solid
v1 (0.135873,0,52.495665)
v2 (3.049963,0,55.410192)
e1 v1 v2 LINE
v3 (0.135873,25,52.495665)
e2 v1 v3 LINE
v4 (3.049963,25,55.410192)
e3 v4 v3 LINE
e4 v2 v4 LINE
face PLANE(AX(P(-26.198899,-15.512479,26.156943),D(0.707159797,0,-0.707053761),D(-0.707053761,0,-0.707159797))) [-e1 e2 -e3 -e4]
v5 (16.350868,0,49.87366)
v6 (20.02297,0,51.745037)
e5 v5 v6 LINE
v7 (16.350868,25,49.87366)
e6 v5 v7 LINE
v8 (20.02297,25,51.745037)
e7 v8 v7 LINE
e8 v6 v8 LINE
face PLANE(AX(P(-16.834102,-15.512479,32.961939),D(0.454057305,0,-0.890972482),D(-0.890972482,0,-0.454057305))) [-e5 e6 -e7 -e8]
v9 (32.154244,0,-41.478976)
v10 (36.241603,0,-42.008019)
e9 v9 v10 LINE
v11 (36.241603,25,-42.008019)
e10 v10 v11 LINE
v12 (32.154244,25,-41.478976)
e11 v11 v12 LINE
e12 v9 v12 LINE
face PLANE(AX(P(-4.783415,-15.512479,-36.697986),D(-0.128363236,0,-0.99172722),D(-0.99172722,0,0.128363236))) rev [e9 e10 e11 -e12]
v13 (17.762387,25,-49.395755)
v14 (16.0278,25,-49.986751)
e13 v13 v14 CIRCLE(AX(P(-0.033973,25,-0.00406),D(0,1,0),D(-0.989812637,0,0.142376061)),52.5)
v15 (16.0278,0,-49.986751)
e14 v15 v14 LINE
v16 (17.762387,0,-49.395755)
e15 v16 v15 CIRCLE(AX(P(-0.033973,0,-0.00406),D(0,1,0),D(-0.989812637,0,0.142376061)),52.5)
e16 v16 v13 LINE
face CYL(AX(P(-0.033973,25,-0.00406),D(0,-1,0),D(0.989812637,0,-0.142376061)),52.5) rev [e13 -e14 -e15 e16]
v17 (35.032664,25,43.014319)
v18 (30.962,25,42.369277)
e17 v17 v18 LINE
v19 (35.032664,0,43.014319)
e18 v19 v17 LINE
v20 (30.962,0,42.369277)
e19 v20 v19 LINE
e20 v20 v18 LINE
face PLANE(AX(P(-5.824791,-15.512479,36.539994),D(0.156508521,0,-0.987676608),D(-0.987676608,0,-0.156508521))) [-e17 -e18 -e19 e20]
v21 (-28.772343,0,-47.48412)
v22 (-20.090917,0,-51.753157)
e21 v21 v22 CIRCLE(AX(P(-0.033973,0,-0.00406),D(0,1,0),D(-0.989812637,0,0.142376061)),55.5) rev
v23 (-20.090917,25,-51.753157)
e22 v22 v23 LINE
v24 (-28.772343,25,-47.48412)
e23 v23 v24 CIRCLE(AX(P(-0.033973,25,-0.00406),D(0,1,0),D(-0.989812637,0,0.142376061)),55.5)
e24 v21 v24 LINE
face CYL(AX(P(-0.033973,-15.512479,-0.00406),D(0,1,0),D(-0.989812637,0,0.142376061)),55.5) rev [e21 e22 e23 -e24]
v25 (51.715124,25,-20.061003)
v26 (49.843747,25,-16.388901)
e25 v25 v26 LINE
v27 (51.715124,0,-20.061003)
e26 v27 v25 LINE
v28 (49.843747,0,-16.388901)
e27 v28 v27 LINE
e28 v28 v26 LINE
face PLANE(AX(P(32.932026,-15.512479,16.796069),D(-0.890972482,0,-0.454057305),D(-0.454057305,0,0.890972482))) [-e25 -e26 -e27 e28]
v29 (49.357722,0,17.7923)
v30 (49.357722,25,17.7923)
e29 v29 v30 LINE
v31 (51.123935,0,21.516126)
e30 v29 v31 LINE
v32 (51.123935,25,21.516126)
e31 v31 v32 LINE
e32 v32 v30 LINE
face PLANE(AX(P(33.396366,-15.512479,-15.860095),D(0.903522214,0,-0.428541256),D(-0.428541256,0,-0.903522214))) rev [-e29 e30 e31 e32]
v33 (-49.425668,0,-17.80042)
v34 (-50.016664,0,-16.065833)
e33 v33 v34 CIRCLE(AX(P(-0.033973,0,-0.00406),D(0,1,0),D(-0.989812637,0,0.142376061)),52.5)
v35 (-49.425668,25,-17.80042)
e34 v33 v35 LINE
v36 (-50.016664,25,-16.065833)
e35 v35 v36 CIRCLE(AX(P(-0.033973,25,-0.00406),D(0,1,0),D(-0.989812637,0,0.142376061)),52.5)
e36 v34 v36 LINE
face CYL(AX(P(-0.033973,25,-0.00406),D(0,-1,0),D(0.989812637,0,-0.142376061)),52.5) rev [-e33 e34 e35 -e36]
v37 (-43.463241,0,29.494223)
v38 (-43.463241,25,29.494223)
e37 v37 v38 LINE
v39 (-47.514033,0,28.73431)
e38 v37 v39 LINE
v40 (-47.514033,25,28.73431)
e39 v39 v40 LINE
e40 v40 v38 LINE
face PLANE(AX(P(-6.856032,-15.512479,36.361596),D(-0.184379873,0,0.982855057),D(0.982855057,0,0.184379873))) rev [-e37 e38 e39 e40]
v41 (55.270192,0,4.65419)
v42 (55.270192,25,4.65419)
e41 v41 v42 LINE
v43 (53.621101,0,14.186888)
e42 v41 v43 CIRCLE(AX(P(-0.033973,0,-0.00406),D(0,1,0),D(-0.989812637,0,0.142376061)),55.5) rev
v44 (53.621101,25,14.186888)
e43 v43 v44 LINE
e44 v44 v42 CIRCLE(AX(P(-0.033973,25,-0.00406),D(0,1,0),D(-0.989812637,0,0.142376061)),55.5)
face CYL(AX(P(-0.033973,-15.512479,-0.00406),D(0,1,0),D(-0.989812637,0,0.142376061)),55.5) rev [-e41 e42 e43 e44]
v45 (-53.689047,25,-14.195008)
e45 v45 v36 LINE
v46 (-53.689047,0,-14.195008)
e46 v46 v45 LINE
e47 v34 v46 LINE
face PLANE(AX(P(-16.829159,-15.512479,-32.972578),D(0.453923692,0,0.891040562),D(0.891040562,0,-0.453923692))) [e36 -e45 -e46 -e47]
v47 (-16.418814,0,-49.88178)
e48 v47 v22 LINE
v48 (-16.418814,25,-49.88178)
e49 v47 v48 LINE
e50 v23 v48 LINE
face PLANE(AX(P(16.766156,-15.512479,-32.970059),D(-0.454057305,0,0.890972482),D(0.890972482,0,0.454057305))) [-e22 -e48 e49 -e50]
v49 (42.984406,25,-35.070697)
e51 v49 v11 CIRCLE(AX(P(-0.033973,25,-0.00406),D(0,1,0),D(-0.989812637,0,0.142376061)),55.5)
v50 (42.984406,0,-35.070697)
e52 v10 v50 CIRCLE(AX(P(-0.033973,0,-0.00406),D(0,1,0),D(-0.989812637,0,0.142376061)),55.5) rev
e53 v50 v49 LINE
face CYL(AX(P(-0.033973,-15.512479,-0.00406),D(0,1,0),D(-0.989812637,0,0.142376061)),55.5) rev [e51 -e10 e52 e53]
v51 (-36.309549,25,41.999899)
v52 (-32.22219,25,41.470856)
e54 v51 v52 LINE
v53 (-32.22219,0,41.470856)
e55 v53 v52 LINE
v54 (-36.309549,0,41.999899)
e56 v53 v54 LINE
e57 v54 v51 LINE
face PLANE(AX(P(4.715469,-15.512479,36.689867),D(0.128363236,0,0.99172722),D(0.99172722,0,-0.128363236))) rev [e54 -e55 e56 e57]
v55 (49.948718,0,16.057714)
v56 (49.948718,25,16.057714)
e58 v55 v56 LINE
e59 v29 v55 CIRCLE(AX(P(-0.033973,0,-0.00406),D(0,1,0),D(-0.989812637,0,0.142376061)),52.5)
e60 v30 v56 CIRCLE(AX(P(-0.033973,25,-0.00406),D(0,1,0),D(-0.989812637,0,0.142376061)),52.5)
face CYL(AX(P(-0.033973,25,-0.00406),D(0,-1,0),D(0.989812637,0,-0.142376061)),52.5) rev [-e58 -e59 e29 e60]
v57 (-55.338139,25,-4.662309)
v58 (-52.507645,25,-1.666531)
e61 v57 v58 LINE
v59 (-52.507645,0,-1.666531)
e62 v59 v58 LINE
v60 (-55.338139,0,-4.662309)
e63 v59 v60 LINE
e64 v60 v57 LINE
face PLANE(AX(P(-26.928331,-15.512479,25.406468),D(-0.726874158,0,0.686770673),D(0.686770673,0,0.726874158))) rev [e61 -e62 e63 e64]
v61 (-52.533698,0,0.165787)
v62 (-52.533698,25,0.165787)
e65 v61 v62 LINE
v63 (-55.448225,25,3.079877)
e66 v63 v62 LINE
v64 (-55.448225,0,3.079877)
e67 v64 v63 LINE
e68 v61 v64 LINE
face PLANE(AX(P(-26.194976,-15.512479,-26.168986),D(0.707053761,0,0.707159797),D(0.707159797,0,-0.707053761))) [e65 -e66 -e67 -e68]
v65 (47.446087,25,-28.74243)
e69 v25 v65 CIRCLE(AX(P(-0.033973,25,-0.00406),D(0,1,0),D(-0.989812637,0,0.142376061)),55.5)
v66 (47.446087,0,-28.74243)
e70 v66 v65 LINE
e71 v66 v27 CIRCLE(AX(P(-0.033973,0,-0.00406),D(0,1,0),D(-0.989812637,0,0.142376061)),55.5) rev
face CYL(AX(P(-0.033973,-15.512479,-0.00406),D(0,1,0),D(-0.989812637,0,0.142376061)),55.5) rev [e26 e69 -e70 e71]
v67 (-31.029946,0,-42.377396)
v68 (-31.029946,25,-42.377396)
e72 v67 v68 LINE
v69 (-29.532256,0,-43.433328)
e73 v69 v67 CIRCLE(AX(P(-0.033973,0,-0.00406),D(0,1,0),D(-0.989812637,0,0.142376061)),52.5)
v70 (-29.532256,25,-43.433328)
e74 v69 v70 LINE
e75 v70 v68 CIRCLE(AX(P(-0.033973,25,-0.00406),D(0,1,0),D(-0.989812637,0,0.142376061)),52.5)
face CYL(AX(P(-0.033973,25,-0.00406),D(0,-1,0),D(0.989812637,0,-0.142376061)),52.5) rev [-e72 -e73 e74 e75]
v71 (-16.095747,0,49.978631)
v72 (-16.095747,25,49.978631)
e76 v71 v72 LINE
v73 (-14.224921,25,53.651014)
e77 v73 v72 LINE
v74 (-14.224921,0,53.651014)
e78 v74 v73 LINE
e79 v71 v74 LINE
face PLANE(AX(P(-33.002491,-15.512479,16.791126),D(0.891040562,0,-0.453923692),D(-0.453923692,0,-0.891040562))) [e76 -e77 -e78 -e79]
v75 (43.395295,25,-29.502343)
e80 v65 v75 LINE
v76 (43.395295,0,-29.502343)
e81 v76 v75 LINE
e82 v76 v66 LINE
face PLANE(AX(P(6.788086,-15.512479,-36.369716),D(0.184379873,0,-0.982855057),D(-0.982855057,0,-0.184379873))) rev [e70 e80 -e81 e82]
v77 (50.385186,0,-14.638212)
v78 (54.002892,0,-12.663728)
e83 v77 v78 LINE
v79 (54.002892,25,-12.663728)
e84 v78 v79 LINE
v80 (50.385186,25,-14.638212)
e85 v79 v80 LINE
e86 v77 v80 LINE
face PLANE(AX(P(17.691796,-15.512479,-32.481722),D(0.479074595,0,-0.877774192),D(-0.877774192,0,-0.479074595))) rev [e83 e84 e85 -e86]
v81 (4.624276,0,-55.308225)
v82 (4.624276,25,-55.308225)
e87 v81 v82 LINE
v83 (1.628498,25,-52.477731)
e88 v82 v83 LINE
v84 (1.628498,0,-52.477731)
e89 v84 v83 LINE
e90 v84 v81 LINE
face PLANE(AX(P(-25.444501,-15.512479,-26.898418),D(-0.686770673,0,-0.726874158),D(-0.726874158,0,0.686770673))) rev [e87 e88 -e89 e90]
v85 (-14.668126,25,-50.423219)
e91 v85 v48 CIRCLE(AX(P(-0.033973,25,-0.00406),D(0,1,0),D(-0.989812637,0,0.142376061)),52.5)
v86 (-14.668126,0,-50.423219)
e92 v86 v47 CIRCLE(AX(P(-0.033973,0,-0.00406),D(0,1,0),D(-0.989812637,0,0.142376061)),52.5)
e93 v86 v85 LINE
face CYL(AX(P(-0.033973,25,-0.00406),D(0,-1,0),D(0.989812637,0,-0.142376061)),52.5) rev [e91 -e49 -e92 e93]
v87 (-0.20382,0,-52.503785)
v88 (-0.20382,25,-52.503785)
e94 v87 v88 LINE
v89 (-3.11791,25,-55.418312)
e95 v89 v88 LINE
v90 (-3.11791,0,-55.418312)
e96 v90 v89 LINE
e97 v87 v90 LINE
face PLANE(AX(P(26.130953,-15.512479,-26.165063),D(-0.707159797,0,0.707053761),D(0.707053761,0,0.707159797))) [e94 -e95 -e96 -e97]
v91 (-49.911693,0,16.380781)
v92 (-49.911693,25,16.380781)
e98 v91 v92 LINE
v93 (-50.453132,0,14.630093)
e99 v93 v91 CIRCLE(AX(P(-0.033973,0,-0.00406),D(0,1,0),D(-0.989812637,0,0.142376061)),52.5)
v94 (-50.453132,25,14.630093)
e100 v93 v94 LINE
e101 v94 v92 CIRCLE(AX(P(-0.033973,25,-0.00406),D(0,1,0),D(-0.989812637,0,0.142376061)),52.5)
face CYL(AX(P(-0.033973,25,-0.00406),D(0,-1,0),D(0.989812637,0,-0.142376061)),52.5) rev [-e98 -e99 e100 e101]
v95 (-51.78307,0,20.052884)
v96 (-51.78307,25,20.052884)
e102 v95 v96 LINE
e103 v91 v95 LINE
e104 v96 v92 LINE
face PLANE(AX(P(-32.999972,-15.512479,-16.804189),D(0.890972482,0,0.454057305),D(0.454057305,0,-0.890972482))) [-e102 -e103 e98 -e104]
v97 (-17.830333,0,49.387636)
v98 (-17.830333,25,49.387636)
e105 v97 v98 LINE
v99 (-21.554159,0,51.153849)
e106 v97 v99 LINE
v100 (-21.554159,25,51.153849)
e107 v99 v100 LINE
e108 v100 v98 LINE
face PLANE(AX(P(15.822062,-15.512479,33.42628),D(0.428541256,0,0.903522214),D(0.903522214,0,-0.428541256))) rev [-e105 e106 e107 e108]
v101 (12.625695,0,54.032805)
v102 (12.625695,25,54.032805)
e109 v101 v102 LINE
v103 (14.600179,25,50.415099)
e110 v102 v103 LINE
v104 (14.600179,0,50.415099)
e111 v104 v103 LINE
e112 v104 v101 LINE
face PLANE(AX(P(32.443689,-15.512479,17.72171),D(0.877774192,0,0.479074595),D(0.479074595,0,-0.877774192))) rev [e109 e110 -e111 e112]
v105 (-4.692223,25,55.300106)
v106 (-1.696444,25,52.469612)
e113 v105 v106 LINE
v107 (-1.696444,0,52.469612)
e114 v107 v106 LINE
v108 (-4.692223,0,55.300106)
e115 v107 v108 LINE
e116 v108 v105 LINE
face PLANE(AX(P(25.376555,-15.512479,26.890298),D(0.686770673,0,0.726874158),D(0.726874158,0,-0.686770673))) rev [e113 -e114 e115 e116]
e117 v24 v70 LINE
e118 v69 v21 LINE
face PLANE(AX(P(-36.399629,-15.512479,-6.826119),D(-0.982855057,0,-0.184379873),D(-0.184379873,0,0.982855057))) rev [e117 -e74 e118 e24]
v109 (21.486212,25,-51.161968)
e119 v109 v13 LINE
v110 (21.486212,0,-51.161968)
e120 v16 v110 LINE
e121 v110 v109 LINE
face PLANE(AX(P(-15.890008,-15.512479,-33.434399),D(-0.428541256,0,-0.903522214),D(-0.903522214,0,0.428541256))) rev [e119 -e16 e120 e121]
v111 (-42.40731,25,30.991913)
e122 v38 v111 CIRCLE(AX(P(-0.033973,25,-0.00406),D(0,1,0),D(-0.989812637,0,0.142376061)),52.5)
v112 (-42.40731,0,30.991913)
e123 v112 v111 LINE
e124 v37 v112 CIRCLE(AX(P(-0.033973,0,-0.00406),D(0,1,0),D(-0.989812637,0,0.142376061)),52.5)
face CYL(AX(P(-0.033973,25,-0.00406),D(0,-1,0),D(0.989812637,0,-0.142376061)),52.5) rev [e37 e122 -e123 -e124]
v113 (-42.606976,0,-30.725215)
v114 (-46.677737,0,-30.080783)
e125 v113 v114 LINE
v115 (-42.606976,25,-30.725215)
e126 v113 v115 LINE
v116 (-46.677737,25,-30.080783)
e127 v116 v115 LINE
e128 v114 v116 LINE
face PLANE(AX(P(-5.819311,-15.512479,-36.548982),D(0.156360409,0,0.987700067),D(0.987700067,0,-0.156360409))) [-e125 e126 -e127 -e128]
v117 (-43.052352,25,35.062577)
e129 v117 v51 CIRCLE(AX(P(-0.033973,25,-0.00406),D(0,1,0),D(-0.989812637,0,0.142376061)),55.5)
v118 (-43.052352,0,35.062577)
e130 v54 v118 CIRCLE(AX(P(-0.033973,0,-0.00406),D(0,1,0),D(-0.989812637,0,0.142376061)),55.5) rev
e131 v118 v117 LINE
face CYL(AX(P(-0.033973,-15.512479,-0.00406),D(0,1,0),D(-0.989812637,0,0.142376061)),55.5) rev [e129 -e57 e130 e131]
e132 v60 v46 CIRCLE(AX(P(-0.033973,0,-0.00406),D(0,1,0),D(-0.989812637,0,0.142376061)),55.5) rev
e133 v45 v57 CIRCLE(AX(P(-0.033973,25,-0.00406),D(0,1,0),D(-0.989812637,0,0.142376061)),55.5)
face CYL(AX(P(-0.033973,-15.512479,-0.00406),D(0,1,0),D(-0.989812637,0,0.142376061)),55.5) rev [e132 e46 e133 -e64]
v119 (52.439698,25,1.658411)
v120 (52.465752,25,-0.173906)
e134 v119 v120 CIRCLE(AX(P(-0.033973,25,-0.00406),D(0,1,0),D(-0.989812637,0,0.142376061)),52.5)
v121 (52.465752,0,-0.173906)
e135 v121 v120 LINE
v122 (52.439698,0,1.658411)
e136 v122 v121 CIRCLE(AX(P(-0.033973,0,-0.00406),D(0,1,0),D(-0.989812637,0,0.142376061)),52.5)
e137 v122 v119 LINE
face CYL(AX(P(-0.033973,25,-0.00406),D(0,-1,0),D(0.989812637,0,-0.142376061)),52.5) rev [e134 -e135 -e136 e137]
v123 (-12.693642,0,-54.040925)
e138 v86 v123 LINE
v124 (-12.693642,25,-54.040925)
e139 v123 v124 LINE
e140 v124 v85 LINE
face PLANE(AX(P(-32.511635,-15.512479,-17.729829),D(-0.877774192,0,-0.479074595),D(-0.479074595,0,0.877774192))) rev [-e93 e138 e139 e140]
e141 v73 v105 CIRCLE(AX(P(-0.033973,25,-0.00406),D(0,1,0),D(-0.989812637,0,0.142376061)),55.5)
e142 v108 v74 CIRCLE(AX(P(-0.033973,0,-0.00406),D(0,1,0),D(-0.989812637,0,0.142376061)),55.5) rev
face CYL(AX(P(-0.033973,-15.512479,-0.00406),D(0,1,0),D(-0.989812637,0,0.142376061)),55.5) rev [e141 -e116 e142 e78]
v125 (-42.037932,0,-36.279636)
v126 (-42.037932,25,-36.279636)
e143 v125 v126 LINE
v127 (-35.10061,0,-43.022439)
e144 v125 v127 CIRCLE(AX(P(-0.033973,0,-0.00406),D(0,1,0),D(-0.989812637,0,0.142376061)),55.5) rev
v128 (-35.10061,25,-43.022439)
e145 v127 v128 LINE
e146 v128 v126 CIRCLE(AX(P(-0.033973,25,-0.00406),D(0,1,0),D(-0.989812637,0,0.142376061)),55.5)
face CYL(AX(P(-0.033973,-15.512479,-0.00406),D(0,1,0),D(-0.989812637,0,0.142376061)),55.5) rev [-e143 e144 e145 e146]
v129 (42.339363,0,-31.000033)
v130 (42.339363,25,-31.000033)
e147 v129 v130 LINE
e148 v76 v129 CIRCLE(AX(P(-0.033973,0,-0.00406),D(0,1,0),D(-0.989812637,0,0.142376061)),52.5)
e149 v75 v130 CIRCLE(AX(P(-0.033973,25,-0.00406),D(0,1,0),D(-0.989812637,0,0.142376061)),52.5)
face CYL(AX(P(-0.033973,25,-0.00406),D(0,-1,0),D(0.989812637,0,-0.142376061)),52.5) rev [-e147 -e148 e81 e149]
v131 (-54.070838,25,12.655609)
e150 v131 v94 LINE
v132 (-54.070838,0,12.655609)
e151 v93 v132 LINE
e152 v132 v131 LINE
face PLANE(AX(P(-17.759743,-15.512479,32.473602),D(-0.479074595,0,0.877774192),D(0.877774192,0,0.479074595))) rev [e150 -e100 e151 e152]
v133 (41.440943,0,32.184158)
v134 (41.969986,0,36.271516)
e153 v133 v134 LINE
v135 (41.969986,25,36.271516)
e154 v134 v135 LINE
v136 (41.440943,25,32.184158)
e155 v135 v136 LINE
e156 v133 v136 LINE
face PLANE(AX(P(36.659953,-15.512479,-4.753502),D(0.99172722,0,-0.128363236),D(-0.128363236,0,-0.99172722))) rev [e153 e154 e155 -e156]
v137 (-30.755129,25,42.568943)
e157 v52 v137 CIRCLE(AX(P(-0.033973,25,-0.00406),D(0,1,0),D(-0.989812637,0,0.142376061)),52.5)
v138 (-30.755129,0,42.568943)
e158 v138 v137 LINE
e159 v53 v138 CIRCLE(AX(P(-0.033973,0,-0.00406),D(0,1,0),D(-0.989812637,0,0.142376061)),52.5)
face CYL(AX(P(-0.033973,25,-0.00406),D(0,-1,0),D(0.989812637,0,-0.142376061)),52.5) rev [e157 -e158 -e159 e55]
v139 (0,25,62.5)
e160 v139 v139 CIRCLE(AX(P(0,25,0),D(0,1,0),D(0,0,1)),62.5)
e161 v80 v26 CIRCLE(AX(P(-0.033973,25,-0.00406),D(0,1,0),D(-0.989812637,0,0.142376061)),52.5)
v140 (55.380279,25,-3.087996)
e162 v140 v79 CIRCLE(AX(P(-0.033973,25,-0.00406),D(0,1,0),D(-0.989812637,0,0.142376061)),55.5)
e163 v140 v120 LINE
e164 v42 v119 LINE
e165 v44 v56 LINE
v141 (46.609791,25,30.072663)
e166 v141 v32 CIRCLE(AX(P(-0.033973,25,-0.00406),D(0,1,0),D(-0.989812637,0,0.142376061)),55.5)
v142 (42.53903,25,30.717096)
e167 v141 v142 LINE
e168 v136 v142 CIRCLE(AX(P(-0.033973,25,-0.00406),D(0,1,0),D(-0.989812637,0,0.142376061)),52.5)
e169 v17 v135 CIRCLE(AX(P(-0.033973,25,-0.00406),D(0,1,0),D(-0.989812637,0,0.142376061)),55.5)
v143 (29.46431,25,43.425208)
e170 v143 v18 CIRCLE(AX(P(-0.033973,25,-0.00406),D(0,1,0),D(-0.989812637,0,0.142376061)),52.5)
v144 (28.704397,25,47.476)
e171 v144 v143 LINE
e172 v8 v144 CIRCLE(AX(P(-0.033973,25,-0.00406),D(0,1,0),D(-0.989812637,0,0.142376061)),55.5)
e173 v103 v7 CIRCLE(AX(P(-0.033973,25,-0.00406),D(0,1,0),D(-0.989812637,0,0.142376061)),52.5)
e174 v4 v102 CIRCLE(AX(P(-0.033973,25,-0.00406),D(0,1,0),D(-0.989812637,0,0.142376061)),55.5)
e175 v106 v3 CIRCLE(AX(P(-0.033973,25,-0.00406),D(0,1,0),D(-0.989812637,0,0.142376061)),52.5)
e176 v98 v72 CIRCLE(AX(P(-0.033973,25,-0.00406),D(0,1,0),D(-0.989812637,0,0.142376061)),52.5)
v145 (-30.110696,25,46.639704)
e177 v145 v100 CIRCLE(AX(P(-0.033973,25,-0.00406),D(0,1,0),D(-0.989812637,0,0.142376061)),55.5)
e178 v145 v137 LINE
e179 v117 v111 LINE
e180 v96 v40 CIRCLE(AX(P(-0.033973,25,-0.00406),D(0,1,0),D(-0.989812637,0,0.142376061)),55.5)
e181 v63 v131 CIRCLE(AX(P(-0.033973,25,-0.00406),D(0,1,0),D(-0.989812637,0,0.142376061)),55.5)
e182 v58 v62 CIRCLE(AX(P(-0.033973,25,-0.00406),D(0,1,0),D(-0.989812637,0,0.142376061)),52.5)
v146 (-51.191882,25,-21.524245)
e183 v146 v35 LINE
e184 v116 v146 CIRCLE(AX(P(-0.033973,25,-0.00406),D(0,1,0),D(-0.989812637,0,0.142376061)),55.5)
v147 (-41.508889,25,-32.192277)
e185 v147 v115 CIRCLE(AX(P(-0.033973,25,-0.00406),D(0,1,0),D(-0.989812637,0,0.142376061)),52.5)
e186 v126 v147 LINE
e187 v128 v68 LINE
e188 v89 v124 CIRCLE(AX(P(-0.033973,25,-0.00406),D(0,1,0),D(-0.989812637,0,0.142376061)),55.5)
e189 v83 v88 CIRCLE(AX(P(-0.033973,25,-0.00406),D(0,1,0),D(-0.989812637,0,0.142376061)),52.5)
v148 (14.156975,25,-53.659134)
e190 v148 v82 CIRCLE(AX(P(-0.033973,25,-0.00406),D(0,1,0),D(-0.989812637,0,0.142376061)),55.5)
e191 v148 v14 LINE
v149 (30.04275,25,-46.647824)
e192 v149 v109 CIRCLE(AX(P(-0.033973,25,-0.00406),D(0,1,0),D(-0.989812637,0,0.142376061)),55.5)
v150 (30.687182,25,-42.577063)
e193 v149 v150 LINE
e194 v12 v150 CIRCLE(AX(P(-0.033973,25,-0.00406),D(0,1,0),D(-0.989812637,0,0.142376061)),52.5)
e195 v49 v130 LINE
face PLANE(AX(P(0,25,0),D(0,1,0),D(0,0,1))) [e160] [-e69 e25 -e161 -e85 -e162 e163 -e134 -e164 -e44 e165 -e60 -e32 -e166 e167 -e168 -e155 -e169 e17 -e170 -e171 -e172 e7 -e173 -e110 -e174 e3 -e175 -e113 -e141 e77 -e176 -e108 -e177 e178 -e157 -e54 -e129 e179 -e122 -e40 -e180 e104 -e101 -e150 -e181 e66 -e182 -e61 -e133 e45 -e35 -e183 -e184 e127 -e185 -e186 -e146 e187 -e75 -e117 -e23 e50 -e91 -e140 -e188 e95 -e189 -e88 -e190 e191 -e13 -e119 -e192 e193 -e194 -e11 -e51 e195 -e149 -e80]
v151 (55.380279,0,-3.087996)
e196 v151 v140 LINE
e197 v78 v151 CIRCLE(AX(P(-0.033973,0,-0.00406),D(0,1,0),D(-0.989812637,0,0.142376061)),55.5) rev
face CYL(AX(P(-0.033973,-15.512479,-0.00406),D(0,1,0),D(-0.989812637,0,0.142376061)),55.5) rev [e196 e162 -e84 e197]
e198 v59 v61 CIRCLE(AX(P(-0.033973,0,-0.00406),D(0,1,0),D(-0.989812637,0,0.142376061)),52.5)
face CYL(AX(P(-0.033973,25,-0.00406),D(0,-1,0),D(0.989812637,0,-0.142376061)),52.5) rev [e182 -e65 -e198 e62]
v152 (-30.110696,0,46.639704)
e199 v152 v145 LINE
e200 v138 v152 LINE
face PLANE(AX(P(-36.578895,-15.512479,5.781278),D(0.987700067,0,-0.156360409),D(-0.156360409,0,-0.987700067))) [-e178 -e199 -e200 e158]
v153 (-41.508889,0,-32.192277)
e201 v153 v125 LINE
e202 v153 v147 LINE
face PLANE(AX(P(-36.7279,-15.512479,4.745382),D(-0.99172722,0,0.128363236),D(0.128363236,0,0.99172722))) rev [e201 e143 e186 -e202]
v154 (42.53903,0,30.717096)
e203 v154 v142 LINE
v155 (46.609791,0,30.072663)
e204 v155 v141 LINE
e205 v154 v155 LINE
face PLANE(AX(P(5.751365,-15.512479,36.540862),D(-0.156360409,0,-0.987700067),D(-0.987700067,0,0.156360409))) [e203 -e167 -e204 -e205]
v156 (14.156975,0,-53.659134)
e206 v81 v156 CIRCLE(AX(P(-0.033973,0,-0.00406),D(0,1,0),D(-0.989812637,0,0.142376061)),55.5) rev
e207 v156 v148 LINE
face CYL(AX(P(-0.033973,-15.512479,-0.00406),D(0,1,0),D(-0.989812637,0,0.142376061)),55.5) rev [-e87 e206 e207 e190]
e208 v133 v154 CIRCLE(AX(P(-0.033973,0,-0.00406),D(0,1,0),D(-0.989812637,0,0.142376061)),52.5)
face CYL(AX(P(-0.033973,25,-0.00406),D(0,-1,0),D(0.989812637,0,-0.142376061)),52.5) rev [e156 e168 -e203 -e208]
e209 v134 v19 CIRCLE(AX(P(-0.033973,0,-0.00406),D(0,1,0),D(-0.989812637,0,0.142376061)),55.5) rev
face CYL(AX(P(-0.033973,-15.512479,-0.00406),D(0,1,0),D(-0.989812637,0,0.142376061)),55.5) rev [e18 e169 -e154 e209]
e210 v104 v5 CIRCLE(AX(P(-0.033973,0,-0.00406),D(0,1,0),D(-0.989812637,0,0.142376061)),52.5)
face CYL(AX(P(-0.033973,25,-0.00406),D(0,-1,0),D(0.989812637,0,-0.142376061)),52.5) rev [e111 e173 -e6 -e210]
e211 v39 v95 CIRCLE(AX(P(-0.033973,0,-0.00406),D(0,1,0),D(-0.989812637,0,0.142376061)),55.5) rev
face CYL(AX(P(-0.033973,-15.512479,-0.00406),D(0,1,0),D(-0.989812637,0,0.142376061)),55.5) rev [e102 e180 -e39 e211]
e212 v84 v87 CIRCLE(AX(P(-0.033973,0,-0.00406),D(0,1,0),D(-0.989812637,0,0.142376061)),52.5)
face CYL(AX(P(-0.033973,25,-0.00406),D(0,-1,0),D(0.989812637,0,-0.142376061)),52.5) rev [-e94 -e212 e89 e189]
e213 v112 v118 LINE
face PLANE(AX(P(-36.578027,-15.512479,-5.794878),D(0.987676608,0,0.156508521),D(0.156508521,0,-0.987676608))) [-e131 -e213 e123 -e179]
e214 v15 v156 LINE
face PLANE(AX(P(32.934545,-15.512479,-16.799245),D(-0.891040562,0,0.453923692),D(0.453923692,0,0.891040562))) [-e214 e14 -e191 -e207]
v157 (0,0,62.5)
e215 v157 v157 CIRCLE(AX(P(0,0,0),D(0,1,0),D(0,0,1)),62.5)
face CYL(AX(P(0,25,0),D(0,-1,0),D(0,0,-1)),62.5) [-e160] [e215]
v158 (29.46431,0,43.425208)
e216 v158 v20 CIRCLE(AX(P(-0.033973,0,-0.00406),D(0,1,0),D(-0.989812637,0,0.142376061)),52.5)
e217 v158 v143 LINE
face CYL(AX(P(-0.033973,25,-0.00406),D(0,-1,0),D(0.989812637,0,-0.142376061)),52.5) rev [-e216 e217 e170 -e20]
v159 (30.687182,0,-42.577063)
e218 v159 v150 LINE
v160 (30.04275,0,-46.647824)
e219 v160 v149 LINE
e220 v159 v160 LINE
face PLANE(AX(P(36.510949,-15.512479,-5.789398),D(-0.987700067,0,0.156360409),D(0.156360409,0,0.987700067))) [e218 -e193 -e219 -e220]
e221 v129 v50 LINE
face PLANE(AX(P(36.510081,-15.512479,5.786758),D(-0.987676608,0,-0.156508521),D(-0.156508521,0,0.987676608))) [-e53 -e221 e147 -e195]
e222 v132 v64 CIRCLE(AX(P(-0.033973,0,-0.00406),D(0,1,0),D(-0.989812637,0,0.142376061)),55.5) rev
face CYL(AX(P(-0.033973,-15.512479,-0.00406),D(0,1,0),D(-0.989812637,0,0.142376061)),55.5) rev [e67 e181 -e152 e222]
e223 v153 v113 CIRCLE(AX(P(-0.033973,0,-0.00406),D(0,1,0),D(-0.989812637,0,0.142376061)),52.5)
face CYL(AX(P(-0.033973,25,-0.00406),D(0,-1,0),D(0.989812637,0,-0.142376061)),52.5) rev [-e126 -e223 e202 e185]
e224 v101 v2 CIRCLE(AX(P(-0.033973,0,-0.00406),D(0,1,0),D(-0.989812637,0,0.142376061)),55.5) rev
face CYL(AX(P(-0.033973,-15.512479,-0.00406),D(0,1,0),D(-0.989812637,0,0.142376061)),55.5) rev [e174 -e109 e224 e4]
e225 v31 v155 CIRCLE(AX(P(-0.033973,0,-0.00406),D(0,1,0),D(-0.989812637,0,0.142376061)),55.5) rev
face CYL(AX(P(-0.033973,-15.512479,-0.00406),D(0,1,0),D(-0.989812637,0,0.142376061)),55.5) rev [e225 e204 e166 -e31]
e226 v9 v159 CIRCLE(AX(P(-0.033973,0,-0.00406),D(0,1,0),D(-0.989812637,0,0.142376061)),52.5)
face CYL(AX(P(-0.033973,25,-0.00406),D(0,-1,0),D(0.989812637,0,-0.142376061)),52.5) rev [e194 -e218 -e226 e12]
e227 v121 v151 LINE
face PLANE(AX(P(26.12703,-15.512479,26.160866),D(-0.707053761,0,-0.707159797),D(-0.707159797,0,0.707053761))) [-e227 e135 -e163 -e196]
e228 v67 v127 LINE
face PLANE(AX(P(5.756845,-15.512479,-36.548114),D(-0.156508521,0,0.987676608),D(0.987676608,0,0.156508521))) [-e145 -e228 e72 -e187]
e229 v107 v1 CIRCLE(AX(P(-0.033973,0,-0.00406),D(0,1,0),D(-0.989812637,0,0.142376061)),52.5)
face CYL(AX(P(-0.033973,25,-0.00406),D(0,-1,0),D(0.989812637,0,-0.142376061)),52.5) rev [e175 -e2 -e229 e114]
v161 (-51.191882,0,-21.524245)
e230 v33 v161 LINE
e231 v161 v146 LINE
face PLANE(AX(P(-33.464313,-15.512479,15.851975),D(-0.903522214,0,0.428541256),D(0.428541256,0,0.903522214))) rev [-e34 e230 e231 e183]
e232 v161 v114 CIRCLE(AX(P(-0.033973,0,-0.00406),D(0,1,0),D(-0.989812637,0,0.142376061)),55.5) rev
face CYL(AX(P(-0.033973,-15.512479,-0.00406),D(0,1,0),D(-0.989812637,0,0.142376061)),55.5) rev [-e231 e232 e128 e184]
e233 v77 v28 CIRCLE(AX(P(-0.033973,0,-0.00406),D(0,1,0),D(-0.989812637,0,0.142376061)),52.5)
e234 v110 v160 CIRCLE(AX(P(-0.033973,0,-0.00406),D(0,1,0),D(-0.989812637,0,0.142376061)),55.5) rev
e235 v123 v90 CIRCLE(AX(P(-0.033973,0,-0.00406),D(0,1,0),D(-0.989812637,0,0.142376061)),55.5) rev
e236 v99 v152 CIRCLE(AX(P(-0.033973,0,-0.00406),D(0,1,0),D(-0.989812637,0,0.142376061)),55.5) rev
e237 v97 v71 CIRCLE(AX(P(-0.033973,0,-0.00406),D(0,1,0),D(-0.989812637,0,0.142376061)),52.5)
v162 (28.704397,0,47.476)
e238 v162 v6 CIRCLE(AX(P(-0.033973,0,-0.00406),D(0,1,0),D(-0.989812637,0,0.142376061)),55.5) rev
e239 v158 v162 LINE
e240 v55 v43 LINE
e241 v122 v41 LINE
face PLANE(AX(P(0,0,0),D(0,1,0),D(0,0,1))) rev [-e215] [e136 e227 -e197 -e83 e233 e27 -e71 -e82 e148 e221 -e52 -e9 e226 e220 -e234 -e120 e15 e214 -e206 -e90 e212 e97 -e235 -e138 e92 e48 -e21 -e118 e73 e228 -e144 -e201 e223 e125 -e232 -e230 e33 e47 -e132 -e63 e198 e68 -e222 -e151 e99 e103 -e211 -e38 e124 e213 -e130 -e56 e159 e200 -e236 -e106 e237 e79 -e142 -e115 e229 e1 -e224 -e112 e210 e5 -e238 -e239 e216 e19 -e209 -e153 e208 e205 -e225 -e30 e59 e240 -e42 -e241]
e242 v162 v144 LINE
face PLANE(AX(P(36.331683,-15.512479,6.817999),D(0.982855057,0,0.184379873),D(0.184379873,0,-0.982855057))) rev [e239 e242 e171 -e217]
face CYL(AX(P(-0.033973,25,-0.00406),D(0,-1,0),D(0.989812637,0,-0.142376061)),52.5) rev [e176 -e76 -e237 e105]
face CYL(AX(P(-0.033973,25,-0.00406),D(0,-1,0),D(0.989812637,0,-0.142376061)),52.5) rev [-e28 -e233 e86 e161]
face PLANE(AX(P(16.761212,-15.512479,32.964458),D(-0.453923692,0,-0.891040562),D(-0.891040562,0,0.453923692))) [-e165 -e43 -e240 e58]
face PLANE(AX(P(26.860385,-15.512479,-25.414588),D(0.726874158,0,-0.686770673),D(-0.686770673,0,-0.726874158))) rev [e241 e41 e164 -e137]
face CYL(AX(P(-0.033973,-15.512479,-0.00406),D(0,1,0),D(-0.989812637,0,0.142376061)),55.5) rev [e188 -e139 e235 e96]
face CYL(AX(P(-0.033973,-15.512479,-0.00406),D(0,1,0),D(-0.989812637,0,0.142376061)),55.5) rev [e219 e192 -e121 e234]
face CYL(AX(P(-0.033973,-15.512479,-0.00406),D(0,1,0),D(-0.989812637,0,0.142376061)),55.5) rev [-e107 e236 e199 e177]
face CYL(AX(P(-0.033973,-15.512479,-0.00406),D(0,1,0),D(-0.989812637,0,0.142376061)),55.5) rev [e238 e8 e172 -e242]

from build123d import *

# Parameters (mm, degrees)
SKETCH1_R           = 62.5
BOSS_EXTRUDE1_DEPTH = 25
CAVITY1_DEPTH       = 25


# Read off the part's stored shape, not the designer's step: Cavity1
with BuildPart() as part:
    # Sketch1 → Boss-Extrude1 (new body)
    with BuildSketch(Plane(origin=(0, 0, 0), x_dir=(1, 0, 0), z_dir=(0, 1, 0))):
        with Locations(Location((0, 0, 0), (0, 0, 270))):
            Circle(SKETCH1_R)
    extrude(amount=BOSS_EXTRUDE1_DEPTH)

    # Cavity1 outline → Cavity1 (cut)
    with BuildSketch(Plane(origin=(0, 0, 0), x_dir=(1, 0, 0), z_dir=(0, 1, 0))):
        with BuildLine():
            Line((16.350867892, -49.873660473), (20.022970331, -51.745036944))
            ThreePointArc((20.022970331, -51.745036944), (24.456878574, -49.800038203), (28.704396647, -47.476000203))
            Line((28.704396647, -47.476000203), (29.464309883, -43.425207924))
            ThreePointArc((29.464309883, -43.425207924), (30.217762384, -42.903777412), (30.961999914, -42.369276757))
            Line((30.961999914, -42.369276757), (35.032663999, -43.014319485))
            ThreePointArc((35.032663999, -43.014319485), (38.648523661, -39.79436276), (41.969986165, -36.271516008))
            Line((41.969986165, -36.271516008), (41.440942946, -32.18415751))
            ThreePointArc((41.440942946, -32.18415751), (41.996387967, -31.455417996), (42.539030133, -30.717095621))
            Line((42.539030133, -30.717095621), (46.609790903, -30.07266333))
            ThreePointArc((46.609790903, -30.07266333), (49.053656447, -25.89294042), (51.12393549, -21.5161257))
            Line((51.12393549, -21.5161257), (49.357722251, -17.792300112))
            ThreePointArc((49.357722251, -17.792300112), (49.660788964, -16.927585698), (49.94871817, -16.05771374))
            Line((49.94871817, -16.05771374), (53.621101197, -14.186887953))
            ThreePointArc((53.621101197, -14.186887953), (54.653750036, -9.456539258), (55.270192281, -4.654189691))
            Line((55.270192281, -4.654189691), (52.43969828, -1.658411006))
            ThreePointArc((52.43969828, -1.658411006), (52.460720403, -0.742365963), (52.465752134, 0.173906448))
            Line((52.465752134, 0.173906448), (55.380278979, 3.087996269))
            ThreePointArc((55.380278979, 3.087996269), (54.900628251, 7.905931261), (54.002892036, 12.66372824))
            Line((54.002892036, 12.66372824), (50.385185747, 14.63821233))
            ThreePointArc((50.385185747, 14.63821233), (50.122105488, 15.515919131), (49.843747202, 16.388900869))
            Line((49.843747202, 16.388900869), (51.715123672, 20.061003308))
            ThreePointArc((51.715123672, 20.061003308), (49.770124931, 24.49491155), (47.446086932, 28.742429624))
            Line((47.446086932, 28.742429624), (43.395294653, 29.50234286))
            ThreePointArc((43.395294653, 29.50234286), (42.87386414, 30.255795361), (42.339363485, 31.000032891))
            Line((42.339363485, 31.000032891), (42.984406214, 35.070696976))
            ThreePointArc((42.984406214, 35.070696976), (39.764449489, 38.686556638), (36.241602736, 42.008019142))
            Line((36.241602736, 42.008019142), (32.154244239, 41.478975923))
            ThreePointArc((32.154244239, 41.478975923), (31.425504725, 42.034420944), (30.68718235, 42.57706311))
            Line((30.68718235, 42.57706311), (30.042750059, 46.64782388))
            ThreePointArc((30.042750059, 46.64782388), (25.863027148, 49.091689424), (21.486212429, 51.161968467))
            Line((21.486212429, 51.161968467), (17.762386841, 49.395755228))
            ThreePointArc((17.762386841, 49.395755228), (16.897672427, 49.698821941), (16.027800469, 49.986751147))
            Line((16.027800469, 49.986751147), (14.156974682, 53.659134174))
            ThreePointArc((14.156974682, 53.659134174), (9.426625987, 54.691783013), (4.62427642, 55.308225258))
            Line((4.62427642, 55.308225258), (1.628497735, 52.477731257))
            ThreePointArc((1.628497735, 52.477731257), (0.712452692, 52.49875338), (-0.20381972, 52.503785111))
            Line((-0.20381972, 52.503785111), (-3.11790954, 55.418311956))
            ThreePointArc((-3.11790954, 55.418311956), (-7.935844532, 54.938661228), (-12.693641511, 54.040925013))
            Line((-12.693641511, 54.040925013), (-14.668125602, 50.423218724))
            ThreePointArc((-14.668125602, 50.423218724), (-15.545832402, 50.160138465), (-16.41881414, 49.881780179))
            Line((-16.41881414, 49.881780179), (-20.090916579, 51.753156649))
            ThreePointArc((-20.090916579, 51.753156649), (-24.524824822, 49.808157908), (-28.772342895, 47.484119909))
            Line((-28.772342895, 47.484119909), (-29.532256132, 43.43332763))
            ThreePointArc((-29.532256132, 43.43332763), (-30.285708633, 42.911897117), (-31.029946162, 42.377396462))
            Line((-31.029946162, 42.377396462), (-35.100610248, 43.022439191))
            ThreePointArc((-35.100610248, 43.022439191), (-38.71646991, 39.802482465), (-42.037932414, 36.279635713))
            Line((-42.037932414, 36.279635713), (-41.508889194, 32.192277216))
            ThreePointArc((-41.508889194, 32.192277216), (-42.064334215, 31.463537702), (-42.606976382, 30.725215327))
            Line((-42.606976382, 30.725215327), (-46.677737151, 30.080783036))
            ThreePointArc((-46.677737151, 30.080783036), (-49.121602695, 25.901060125), (-51.191881738, 21.524245406))
            Line((-51.191881738, 21.524245406), (-49.425668499, 17.800419818))
            ThreePointArc((-49.425668499, 17.800419818), (-49.728735212, 16.935705404), (-50.016664419, 16.065833446))
            Line((-50.016664419, 16.065833446), (-53.689047445, 14.195007659))
            ThreePointArc((-53.689047445, 14.195007659), (-54.721696284, 9.464658964), (-55.33813853, 4.662309397))
            Line((-55.33813853, 4.662309397), (-52.507644528, 1.666530712))
            ThreePointArc((-52.507644528, 1.666530712), (-52.528666651, 0.750485669), (-52.533698382, -0.165786743))
            Line((-52.533698382, -0.165786743), (-55.448225228, -3.079876563))
            ThreePointArc((-55.448225228, -3.079876563), (-54.968574499, -7.897811555), (-54.070838284, -12.655608534))
            Line((-54.070838284, -12.655608534), (-50.453131995, -14.630092625))
            ThreePointArc((-50.453131995, -14.630092625), (-50.190051736, -15.507799425), (-49.91169345, -16.380781163))
            Line((-49.91169345, -16.380781163), (-51.783069921, -20.052883602))
            ThreePointArc((-51.783069921, -20.052883602), (-49.83807118, -24.486791845), (-47.51403318, -28.734309918))
            Line((-47.51403318, -28.734309918), (-43.463240901, -29.494223155))
            ThreePointArc((-43.463240901, -29.494223155), (-42.941810389, -30.247675656), (-42.407309734, -30.991913185))
            Line((-42.407309734, -30.991913185), (-43.052352462, -35.062577271))
            ThreePointArc((-43.052352462, -35.062577271), (-39.832395737, -38.678436932), (-36.309548985, -41.999899437))
            Line((-36.309548985, -41.999899437), (-32.222190487, -41.470856217))
            ThreePointArc((-32.222190487, -41.470856217), (-31.493450973, -42.026301238), (-30.755128598, -42.568943405))
            Line((-30.755128598, -42.568943405), (-30.110696307, -46.639704174))
            ThreePointArc((-30.110696307, -46.639704174), (-25.930973397, -49.083569718), (-21.554158677, -51.153848761))
            Line((-21.554158677, -51.153848761), (-17.830333089, -49.387635522))
            ThreePointArc((-17.830333089, -49.387635522), (-16.965618675, -49.690702235), (-16.095746717, -49.978631442))
            Line((-16.095746717, -49.978631442), (-14.22492093, -53.651014468))
            ThreePointArc((-14.22492093, -53.651014468), (-9.494572235, -54.683663307), (-4.692222668, -55.300105553))
            Line((-4.692222668, -55.300105553), (-1.696443983, -52.469611551))
            ThreePointArc((-1.696443983, -52.469611551), (-0.78039894, -52.490633674), (0.135873471, -52.495665405))
            Line((0.135873471, -52.495665405), (3.049963292, -55.410192251))
            ThreePointArc((3.049963292, -55.410192251), (7.867898284, -54.930541522), (12.625695263, -54.032805307))
            Line((12.625695263, -54.032805307), (14.600179353, -50.415099018))
            ThreePointArc((14.600179353, -50.415099018), (15.477886154, -50.152018759), (16.350867892, -49.873660473))
        make_face()
    extrude(amount=CAVITY1_DEPTH, mode=Mode.SUBTRACT)


solid = part.part
